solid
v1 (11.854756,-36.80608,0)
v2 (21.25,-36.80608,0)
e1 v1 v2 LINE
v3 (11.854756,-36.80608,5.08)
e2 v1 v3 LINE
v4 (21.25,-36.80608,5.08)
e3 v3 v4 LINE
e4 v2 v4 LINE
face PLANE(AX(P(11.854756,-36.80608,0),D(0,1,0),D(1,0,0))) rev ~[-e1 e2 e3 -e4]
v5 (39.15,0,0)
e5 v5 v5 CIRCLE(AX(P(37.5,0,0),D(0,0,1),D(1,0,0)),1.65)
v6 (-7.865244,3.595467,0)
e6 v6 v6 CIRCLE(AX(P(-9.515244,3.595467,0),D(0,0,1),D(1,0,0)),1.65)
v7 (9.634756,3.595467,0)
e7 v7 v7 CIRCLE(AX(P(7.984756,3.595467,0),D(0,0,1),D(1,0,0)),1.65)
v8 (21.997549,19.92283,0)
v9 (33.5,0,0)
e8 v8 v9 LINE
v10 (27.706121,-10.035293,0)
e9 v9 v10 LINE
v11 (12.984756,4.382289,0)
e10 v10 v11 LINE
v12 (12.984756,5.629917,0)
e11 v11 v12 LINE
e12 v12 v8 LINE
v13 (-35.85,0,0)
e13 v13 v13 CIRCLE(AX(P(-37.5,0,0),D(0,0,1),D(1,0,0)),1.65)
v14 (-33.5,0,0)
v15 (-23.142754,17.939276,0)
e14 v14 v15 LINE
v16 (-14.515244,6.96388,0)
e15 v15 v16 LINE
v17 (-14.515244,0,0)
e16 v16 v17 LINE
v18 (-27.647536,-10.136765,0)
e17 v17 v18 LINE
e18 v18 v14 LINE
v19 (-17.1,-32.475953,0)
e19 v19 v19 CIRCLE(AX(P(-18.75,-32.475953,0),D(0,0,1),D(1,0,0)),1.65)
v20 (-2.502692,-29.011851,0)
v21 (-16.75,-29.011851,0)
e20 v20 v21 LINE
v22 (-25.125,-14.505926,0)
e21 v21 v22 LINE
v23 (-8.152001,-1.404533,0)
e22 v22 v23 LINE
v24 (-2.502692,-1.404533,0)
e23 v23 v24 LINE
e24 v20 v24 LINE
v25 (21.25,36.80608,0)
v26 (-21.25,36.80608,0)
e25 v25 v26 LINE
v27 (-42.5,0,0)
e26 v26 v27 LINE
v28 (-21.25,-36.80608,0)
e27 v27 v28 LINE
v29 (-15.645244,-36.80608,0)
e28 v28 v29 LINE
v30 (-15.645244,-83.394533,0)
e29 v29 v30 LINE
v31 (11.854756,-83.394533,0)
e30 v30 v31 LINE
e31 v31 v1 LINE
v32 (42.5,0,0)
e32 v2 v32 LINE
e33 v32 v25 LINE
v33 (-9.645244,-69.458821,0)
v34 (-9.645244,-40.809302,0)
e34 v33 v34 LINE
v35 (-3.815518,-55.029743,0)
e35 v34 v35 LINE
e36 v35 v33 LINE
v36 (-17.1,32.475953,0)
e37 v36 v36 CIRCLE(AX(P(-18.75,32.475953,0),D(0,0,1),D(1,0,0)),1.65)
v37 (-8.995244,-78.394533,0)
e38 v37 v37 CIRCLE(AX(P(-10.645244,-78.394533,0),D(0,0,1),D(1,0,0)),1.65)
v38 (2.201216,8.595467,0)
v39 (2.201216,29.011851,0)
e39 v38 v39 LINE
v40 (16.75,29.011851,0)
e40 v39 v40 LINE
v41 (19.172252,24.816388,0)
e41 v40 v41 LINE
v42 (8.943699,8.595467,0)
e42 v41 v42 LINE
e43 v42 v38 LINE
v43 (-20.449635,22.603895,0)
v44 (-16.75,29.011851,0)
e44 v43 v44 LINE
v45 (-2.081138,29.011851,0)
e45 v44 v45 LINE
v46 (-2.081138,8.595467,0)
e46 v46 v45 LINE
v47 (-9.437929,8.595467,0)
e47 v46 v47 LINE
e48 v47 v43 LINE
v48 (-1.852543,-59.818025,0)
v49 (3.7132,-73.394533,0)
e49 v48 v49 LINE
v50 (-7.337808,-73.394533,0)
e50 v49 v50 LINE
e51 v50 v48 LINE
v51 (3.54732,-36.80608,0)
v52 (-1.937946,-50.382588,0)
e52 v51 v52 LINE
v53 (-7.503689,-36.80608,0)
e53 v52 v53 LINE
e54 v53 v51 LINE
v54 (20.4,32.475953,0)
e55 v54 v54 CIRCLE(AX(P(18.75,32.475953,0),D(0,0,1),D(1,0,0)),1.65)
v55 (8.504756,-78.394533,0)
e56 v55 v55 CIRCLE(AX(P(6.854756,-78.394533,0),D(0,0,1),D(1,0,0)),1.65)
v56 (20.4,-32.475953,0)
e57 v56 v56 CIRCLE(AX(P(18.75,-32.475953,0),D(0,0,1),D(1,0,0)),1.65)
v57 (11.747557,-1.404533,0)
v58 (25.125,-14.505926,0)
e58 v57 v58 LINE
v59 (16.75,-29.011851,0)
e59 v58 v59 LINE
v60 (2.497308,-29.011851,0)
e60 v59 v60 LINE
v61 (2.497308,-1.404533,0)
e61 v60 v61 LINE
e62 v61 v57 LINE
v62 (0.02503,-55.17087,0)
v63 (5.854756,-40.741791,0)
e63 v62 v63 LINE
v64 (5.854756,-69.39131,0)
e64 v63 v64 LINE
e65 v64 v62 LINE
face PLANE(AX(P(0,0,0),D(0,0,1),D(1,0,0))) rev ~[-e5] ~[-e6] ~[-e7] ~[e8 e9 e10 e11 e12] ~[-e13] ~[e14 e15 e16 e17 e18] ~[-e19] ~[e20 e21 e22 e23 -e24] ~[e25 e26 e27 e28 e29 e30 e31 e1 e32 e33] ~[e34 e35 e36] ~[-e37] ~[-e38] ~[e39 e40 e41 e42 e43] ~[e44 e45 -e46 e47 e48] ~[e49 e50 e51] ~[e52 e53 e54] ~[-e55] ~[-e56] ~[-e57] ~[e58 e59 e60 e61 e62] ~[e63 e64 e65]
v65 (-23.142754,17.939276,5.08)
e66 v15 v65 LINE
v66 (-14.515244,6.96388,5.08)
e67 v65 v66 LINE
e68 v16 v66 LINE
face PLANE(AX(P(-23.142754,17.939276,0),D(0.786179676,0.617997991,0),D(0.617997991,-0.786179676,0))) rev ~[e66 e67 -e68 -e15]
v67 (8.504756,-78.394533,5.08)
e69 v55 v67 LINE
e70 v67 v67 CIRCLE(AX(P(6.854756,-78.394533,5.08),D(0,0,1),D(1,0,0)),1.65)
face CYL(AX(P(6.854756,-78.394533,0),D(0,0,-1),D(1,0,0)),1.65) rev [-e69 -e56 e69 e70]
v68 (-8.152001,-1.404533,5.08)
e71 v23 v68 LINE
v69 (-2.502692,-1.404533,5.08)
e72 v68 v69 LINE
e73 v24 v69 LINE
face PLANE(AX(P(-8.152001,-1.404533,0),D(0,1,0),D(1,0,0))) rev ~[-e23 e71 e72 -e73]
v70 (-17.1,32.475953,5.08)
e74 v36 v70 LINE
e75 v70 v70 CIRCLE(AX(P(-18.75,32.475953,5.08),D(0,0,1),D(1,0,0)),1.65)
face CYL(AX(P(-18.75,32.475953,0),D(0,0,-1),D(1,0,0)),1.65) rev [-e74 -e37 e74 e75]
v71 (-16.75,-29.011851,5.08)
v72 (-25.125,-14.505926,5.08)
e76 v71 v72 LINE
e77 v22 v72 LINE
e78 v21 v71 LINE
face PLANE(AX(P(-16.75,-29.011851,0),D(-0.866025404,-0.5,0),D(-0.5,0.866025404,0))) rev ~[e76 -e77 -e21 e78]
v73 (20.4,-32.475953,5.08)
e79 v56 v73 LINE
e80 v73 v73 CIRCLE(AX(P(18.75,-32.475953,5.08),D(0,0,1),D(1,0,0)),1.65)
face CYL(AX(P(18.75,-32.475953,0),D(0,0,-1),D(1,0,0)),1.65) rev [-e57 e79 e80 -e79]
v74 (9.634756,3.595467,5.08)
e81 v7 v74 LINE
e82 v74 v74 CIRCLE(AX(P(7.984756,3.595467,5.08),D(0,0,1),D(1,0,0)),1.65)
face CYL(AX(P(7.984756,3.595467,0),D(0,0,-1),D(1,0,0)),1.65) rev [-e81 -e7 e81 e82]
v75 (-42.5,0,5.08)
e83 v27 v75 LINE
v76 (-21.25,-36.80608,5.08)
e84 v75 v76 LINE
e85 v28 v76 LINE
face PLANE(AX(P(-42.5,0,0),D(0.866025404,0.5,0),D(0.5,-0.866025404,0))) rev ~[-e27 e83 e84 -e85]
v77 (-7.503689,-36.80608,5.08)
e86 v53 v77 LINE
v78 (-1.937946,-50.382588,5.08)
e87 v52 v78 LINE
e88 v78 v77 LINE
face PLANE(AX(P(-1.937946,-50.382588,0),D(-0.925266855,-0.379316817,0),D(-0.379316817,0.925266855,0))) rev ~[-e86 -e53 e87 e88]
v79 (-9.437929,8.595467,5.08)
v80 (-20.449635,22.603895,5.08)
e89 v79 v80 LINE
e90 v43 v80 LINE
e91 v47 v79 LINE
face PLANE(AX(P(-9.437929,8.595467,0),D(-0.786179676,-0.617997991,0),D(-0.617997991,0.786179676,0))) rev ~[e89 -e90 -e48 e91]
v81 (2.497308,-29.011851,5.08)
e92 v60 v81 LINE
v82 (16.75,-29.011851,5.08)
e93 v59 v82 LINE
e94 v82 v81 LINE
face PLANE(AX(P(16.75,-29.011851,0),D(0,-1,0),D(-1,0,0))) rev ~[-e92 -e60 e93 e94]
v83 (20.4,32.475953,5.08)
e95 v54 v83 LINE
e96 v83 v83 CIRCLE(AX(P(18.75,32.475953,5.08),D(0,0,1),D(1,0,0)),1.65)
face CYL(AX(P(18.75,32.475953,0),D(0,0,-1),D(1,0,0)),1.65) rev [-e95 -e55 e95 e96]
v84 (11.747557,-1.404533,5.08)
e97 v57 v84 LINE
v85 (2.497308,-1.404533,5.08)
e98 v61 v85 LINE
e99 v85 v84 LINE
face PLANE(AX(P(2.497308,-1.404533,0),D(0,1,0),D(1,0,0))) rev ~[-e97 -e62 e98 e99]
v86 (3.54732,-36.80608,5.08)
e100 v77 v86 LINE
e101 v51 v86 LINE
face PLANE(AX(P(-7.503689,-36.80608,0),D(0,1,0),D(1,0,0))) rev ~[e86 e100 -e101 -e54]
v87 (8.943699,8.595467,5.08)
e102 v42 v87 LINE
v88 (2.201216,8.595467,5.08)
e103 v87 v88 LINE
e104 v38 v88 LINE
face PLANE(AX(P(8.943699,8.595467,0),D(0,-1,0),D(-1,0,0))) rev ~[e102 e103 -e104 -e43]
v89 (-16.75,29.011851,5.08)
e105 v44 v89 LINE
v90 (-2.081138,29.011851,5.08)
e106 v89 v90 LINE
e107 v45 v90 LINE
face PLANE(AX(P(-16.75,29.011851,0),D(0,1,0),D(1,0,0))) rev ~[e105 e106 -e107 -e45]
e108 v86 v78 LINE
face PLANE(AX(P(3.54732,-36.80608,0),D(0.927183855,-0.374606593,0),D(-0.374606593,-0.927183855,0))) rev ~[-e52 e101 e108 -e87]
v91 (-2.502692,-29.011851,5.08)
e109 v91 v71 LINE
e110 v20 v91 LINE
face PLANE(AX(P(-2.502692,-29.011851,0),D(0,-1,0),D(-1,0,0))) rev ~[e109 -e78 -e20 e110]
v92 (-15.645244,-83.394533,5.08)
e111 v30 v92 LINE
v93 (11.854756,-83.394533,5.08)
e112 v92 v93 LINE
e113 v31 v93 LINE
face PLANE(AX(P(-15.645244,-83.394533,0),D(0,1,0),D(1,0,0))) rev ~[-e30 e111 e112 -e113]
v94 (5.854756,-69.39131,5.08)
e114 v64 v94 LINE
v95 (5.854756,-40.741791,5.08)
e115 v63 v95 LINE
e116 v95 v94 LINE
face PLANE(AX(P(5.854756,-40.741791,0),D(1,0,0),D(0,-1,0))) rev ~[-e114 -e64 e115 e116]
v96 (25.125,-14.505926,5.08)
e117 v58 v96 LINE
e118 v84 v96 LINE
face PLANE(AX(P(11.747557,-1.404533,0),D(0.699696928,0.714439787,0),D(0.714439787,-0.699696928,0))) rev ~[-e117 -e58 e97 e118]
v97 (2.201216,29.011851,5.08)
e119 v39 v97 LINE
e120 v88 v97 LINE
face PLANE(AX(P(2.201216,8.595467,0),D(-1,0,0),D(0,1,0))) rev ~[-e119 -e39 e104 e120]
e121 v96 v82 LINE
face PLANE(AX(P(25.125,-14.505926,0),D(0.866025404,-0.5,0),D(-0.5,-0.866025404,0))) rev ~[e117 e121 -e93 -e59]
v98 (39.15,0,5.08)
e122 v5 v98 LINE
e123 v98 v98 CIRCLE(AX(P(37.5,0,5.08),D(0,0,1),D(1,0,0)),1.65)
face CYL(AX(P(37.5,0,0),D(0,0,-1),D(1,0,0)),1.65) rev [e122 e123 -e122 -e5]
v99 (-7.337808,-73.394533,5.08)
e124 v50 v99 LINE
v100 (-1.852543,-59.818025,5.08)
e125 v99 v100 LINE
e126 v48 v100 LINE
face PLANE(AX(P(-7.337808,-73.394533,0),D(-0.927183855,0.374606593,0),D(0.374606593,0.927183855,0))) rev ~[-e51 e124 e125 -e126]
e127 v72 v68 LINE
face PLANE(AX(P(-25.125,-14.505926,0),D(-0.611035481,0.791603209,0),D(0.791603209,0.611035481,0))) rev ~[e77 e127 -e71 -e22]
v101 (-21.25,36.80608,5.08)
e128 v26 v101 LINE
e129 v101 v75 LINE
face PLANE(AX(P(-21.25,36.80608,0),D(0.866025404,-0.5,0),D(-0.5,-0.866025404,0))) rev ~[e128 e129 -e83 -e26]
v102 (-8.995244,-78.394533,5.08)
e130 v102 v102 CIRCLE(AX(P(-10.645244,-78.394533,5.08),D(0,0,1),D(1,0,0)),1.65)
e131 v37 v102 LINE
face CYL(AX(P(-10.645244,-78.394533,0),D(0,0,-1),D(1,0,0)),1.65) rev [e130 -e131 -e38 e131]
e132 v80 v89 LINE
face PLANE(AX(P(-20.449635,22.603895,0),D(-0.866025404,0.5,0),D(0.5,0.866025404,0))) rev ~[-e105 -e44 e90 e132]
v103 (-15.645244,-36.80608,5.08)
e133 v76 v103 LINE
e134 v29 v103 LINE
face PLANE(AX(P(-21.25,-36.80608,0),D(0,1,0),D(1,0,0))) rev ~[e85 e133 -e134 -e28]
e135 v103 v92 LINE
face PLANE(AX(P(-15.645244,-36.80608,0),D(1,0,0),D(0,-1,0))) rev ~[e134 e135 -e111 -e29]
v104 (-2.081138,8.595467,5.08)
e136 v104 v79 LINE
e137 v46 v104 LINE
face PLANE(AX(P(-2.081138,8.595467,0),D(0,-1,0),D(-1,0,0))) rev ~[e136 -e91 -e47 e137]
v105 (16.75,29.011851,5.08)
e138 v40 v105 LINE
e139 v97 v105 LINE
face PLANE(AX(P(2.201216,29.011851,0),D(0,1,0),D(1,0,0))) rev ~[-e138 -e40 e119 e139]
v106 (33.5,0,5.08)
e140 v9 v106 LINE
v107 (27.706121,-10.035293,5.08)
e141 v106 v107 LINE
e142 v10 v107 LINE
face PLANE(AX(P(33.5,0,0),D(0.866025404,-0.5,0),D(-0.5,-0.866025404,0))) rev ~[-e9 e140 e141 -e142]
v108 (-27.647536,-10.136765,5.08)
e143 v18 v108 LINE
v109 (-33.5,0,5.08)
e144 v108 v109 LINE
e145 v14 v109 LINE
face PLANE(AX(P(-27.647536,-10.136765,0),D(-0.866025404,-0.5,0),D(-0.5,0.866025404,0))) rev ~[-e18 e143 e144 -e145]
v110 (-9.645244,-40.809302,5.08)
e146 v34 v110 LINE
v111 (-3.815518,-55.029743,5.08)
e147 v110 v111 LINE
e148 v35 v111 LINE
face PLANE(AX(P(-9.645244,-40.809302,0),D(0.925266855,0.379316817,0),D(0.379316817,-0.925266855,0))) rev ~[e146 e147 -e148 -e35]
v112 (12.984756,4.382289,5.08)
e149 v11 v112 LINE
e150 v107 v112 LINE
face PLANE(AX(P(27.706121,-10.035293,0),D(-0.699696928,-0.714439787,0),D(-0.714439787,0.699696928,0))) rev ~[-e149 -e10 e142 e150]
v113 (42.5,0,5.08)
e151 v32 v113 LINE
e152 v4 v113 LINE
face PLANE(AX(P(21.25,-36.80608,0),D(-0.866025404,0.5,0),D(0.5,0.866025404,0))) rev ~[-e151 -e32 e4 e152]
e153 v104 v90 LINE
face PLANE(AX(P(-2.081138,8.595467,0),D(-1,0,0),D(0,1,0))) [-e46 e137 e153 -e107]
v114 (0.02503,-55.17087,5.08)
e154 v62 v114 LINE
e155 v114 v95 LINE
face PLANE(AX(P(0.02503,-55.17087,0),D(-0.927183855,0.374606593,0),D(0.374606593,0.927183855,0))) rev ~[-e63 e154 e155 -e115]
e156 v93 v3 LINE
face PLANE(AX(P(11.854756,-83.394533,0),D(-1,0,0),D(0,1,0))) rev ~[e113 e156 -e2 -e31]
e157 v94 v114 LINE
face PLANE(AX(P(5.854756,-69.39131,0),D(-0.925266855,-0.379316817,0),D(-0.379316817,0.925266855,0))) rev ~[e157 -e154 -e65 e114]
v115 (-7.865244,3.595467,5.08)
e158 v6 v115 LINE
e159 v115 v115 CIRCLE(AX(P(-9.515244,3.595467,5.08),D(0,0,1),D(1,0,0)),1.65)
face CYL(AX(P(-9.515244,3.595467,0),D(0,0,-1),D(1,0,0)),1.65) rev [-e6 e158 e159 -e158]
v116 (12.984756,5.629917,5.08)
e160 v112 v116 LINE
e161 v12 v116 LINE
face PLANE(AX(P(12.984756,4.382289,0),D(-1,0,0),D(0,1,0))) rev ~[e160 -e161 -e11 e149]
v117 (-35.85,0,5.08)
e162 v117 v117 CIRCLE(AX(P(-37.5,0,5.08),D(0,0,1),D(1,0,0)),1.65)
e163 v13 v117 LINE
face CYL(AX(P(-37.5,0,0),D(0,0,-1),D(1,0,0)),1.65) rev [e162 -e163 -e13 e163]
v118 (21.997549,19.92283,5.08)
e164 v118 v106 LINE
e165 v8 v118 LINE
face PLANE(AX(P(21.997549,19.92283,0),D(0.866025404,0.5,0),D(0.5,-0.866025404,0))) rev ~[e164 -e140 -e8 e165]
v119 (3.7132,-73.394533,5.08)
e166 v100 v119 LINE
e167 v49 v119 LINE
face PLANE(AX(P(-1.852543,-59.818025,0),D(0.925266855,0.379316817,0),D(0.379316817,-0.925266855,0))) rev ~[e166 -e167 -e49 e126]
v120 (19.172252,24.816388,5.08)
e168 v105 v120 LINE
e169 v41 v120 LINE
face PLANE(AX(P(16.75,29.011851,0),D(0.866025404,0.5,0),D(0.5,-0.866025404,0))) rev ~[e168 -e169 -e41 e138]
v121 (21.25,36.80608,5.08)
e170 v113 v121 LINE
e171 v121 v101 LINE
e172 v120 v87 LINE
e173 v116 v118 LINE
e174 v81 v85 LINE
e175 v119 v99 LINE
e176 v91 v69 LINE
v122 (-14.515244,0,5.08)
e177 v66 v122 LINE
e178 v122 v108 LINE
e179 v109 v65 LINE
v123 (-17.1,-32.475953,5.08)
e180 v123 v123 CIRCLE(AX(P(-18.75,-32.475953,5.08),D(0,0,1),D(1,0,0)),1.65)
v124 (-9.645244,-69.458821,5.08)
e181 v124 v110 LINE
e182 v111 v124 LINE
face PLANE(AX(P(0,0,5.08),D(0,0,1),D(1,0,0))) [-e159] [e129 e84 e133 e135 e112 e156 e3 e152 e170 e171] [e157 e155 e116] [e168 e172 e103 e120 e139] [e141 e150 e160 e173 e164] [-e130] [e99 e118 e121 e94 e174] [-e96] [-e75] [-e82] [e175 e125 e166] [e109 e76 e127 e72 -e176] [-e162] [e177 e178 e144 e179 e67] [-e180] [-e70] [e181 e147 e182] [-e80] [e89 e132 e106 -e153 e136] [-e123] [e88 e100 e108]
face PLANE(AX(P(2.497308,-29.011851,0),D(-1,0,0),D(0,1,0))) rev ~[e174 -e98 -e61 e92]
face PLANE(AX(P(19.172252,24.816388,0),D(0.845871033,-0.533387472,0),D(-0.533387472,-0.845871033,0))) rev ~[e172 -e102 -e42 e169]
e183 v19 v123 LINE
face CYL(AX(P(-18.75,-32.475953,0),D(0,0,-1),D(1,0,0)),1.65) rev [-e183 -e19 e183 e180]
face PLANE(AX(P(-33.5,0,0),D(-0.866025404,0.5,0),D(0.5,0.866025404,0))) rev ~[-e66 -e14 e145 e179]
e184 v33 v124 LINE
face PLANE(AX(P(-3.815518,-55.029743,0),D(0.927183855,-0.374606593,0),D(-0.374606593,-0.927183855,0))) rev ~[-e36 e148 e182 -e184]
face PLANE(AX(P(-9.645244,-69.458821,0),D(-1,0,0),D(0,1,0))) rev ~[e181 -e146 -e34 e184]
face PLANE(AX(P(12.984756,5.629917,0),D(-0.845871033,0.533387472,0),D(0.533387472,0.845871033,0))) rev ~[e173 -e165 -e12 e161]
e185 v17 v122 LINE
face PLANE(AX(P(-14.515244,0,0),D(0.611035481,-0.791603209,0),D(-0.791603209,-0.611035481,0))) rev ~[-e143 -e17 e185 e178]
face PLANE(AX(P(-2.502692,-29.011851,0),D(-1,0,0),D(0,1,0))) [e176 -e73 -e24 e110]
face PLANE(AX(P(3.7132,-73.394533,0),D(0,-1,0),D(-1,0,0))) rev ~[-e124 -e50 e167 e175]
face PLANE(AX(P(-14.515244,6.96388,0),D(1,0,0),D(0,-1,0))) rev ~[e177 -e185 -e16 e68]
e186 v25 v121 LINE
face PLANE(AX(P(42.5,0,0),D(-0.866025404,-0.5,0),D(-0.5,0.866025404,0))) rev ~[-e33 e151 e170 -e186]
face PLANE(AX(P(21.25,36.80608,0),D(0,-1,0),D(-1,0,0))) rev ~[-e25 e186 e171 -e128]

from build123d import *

# Parameters (mm, degrees)
F0_R     = 1.65
F0_W     = 4.2823543772
F0_H     = 20.4163840114
F0_W_2   = 5
F0_H_2   = 27.6073180421
F1_DEPTH = 5.08


# Not quite as in the source:
# - a feature names something its author has since deleted; it is built from what else it names


with BuildPart() as f1:
    # F0 (on Top) → F1 (new body)
    with BuildSketch(Plane.XY):
        Polygon((21.25, 36.8060796608), (-21.25, 36.8060796608), (-42.5, 0), (-21.25, -36.8060796608), (-15.6452442706, -36.8060796608), (-9.6452442706, -36.8060796608), (-7.5036888061, -36.8060796608), (3.5473197586, -36.8060796608), (5.8547557294, -36.8060796608), (11.8547557294, -36.8060796608), (21.25, -36.8060796608), (42.5, 0), align=None)
        with Locations((-18.75, -32.4759526419)):
            Circle(F0_R, mode=Mode.SUBTRACT)
        with Locations((18.75, -32.4759526419)):
            Circle(F0_R, mode=Mode.SUBTRACT)
        with Locations((-37.5, 0)):
            Circle(F0_R, mode=Mode.SUBTRACT)
        with Locations((-18.75, 32.4759526419)):
            Circle(F0_R, mode=Mode.SUBTRACT)
        Polygon((-20.4496354018, 22.6038945413), (-16.75, 29.0118510268), (-2.0811383147, 29.0118510268), (2.2012160625, 29.0118510268), (16.75, 29.0118510268), (19.1722516141, 24.8163881624), (21.9975489559, 19.92282962), (33.5, 0), (27.7061208369, -10.0352930835), (25.125, -14.5059255134), (16.75, -29.0118510268), (2.497308068, -29.0118510268), (-2.502691932, -29.0118510268), (-16.75, -29.0118510268), (-25.125, -14.5059255134), (-27.6475357555, -10.1367654209), (-33.5, 0), (-23.1427541029, 17.9392761202), align=None, mode=Mode.SUBTRACT)
        with Locations((37.5, 0)):
            Circle(F0_R, mode=Mode.SUBTRACT)
        with Locations((18.75, 32.4759526419)):
            Circle(F0_R, mode=Mode.SUBTRACT)
        Polygon((2.2012160625, 8.5954670154), (-2.0811383147, 8.5954670154), (-9.4379286368, 8.5954670154), (-14.5152442706, 8.5954670154), (-14.5152442706, 6.9638797721), (-14.5152442706, 0), (-14.5152442706, -1.4045329846), (-8.1520013755, -1.4045329846), (-2.502691932, -1.4045329846), (2.497308068, -1.4045329846), (11.7475565604, -1.4045329846), (12.9847557294, -1.4045329846), (12.9847557294, 4.3822885496), (12.9847557294, 5.62991663), (12.9847557294, 8.5954670154), (8.9436992999, 8.5954670154), align=None)
        with Locations((-9.5152442706, 3.5954670154)):
            Circle(F0_R, mode=Mode.SUBTRACT)
        with Locations((7.9847557294, 3.5954670154)):
            Circle(F0_R, mode=Mode.SUBTRACT)
        Polygon((-9.6452442706, -36.8060796608), (-15.6452442706, -36.8060796608), (-15.6452442706, -73.3945329846), (-9.6452442706, -73.3945329846), (-9.6452442706, -69.4588214522), (-9.6452442706, -40.8093024077), align=None)
        Polygon((11.8547557294, -73.3945329846), (11.8547557294, -36.8060796608), (5.8547557294, -36.8060796608), (5.8547557294, -40.7417911932), (5.8547557294, -69.3913102377), (5.8547557294, -73.3945329846), align=None)
        Polygon((5.8547557294, -40.7417911932), (5.8547557294, -36.8060796608), (3.5473197586, -36.8060796608), (-1.9379455123, -50.3825876202), (0.0250296589, -55.1708695493), align=None)
        Polygon((-7.5036888061, -36.8060796608), (-9.6452442706, -36.8060796608), (-9.6452442706, -40.8093024077), (-3.8155182001, -55.0297430961), (-1.9379455123, -50.3825876202), align=None)
        Polygon((0.0250296589, -55.1708695493), (-1.9379455123, -50.3825876202), (-3.8155182001, -55.0297430961), (-1.8525430289, -59.8180250252), align=None)
        Polygon((-9.6452442706, -69.4588214522), (-9.6452442706, -73.3945329846), (-7.3378082997, -73.3945329846), (-1.8525430289, -59.8180250252), (-3.8155182001, -55.0297430961), align=None)
        Polygon((3.713200265, -73.3945329846), (5.8547557294, -73.3945329846), (5.8547557294, -69.3913102377), (0.0250296589, -55.1708695493), (-1.8525430289, -59.8180250252), align=None)
        Polygon((-9.6452442706, -73.3945329846), (-15.6452442706, -73.3945329846), (-15.6452442706, -83.3945329846), (11.8547557294, -83.3945329846), (11.8547557294, -73.3945329846), (5.8547557294, -73.3945329846), (3.713200265, -73.3945329846), (-7.3378082997, -73.3945329846), align=None)
        with Locations((-10.6452442706, -78.3945329846)):
            Circle(F0_R, mode=Mode.SUBTRACT)
        with Locations((6.8547557294, -78.3945329846)):
            Circle(F0_R, mode=Mode.SUBTRACT)
        Polygon((-9.4379286368, 8.5954670154), (-20.4496354018, 22.6038945413), (-23.1427541029, 17.9392761202), (-14.5152442706, 6.9638797721), (-14.5152442706, 8.5954670154), align=None)
        with Locations((0.0600388739, 18.8036590211)):
            Rectangle(F0_W, F0_H)
        Polygon((21.9975489559, 19.92282962), (19.1722516141, 24.8163881624), (8.9436992999, 8.5954670154), (12.9847557294, 8.5954670154), (12.9847557294, 5.62991663), align=None)
        Polygon((25.125, -14.5059255134), (27.7061208369, -10.0352930835), (12.9847557294, 4.3822885496), (12.9847557294, -1.4045329846), (11.7475565604, -1.4045329846), align=None)
        Polygon((-14.5152442706, 0), (-27.6475357555, -10.1367654209), (-25.125, -14.5059255134), (-8.1520013755, -1.4045329846), (-14.5152442706, -1.4045329846), align=None)
        with Locations((-0.002691932, -15.2081920057)):
            Rectangle(F0_W_2, F0_H_2)
    extrude(amount=F1_DEPTH)


solid = f1.part
